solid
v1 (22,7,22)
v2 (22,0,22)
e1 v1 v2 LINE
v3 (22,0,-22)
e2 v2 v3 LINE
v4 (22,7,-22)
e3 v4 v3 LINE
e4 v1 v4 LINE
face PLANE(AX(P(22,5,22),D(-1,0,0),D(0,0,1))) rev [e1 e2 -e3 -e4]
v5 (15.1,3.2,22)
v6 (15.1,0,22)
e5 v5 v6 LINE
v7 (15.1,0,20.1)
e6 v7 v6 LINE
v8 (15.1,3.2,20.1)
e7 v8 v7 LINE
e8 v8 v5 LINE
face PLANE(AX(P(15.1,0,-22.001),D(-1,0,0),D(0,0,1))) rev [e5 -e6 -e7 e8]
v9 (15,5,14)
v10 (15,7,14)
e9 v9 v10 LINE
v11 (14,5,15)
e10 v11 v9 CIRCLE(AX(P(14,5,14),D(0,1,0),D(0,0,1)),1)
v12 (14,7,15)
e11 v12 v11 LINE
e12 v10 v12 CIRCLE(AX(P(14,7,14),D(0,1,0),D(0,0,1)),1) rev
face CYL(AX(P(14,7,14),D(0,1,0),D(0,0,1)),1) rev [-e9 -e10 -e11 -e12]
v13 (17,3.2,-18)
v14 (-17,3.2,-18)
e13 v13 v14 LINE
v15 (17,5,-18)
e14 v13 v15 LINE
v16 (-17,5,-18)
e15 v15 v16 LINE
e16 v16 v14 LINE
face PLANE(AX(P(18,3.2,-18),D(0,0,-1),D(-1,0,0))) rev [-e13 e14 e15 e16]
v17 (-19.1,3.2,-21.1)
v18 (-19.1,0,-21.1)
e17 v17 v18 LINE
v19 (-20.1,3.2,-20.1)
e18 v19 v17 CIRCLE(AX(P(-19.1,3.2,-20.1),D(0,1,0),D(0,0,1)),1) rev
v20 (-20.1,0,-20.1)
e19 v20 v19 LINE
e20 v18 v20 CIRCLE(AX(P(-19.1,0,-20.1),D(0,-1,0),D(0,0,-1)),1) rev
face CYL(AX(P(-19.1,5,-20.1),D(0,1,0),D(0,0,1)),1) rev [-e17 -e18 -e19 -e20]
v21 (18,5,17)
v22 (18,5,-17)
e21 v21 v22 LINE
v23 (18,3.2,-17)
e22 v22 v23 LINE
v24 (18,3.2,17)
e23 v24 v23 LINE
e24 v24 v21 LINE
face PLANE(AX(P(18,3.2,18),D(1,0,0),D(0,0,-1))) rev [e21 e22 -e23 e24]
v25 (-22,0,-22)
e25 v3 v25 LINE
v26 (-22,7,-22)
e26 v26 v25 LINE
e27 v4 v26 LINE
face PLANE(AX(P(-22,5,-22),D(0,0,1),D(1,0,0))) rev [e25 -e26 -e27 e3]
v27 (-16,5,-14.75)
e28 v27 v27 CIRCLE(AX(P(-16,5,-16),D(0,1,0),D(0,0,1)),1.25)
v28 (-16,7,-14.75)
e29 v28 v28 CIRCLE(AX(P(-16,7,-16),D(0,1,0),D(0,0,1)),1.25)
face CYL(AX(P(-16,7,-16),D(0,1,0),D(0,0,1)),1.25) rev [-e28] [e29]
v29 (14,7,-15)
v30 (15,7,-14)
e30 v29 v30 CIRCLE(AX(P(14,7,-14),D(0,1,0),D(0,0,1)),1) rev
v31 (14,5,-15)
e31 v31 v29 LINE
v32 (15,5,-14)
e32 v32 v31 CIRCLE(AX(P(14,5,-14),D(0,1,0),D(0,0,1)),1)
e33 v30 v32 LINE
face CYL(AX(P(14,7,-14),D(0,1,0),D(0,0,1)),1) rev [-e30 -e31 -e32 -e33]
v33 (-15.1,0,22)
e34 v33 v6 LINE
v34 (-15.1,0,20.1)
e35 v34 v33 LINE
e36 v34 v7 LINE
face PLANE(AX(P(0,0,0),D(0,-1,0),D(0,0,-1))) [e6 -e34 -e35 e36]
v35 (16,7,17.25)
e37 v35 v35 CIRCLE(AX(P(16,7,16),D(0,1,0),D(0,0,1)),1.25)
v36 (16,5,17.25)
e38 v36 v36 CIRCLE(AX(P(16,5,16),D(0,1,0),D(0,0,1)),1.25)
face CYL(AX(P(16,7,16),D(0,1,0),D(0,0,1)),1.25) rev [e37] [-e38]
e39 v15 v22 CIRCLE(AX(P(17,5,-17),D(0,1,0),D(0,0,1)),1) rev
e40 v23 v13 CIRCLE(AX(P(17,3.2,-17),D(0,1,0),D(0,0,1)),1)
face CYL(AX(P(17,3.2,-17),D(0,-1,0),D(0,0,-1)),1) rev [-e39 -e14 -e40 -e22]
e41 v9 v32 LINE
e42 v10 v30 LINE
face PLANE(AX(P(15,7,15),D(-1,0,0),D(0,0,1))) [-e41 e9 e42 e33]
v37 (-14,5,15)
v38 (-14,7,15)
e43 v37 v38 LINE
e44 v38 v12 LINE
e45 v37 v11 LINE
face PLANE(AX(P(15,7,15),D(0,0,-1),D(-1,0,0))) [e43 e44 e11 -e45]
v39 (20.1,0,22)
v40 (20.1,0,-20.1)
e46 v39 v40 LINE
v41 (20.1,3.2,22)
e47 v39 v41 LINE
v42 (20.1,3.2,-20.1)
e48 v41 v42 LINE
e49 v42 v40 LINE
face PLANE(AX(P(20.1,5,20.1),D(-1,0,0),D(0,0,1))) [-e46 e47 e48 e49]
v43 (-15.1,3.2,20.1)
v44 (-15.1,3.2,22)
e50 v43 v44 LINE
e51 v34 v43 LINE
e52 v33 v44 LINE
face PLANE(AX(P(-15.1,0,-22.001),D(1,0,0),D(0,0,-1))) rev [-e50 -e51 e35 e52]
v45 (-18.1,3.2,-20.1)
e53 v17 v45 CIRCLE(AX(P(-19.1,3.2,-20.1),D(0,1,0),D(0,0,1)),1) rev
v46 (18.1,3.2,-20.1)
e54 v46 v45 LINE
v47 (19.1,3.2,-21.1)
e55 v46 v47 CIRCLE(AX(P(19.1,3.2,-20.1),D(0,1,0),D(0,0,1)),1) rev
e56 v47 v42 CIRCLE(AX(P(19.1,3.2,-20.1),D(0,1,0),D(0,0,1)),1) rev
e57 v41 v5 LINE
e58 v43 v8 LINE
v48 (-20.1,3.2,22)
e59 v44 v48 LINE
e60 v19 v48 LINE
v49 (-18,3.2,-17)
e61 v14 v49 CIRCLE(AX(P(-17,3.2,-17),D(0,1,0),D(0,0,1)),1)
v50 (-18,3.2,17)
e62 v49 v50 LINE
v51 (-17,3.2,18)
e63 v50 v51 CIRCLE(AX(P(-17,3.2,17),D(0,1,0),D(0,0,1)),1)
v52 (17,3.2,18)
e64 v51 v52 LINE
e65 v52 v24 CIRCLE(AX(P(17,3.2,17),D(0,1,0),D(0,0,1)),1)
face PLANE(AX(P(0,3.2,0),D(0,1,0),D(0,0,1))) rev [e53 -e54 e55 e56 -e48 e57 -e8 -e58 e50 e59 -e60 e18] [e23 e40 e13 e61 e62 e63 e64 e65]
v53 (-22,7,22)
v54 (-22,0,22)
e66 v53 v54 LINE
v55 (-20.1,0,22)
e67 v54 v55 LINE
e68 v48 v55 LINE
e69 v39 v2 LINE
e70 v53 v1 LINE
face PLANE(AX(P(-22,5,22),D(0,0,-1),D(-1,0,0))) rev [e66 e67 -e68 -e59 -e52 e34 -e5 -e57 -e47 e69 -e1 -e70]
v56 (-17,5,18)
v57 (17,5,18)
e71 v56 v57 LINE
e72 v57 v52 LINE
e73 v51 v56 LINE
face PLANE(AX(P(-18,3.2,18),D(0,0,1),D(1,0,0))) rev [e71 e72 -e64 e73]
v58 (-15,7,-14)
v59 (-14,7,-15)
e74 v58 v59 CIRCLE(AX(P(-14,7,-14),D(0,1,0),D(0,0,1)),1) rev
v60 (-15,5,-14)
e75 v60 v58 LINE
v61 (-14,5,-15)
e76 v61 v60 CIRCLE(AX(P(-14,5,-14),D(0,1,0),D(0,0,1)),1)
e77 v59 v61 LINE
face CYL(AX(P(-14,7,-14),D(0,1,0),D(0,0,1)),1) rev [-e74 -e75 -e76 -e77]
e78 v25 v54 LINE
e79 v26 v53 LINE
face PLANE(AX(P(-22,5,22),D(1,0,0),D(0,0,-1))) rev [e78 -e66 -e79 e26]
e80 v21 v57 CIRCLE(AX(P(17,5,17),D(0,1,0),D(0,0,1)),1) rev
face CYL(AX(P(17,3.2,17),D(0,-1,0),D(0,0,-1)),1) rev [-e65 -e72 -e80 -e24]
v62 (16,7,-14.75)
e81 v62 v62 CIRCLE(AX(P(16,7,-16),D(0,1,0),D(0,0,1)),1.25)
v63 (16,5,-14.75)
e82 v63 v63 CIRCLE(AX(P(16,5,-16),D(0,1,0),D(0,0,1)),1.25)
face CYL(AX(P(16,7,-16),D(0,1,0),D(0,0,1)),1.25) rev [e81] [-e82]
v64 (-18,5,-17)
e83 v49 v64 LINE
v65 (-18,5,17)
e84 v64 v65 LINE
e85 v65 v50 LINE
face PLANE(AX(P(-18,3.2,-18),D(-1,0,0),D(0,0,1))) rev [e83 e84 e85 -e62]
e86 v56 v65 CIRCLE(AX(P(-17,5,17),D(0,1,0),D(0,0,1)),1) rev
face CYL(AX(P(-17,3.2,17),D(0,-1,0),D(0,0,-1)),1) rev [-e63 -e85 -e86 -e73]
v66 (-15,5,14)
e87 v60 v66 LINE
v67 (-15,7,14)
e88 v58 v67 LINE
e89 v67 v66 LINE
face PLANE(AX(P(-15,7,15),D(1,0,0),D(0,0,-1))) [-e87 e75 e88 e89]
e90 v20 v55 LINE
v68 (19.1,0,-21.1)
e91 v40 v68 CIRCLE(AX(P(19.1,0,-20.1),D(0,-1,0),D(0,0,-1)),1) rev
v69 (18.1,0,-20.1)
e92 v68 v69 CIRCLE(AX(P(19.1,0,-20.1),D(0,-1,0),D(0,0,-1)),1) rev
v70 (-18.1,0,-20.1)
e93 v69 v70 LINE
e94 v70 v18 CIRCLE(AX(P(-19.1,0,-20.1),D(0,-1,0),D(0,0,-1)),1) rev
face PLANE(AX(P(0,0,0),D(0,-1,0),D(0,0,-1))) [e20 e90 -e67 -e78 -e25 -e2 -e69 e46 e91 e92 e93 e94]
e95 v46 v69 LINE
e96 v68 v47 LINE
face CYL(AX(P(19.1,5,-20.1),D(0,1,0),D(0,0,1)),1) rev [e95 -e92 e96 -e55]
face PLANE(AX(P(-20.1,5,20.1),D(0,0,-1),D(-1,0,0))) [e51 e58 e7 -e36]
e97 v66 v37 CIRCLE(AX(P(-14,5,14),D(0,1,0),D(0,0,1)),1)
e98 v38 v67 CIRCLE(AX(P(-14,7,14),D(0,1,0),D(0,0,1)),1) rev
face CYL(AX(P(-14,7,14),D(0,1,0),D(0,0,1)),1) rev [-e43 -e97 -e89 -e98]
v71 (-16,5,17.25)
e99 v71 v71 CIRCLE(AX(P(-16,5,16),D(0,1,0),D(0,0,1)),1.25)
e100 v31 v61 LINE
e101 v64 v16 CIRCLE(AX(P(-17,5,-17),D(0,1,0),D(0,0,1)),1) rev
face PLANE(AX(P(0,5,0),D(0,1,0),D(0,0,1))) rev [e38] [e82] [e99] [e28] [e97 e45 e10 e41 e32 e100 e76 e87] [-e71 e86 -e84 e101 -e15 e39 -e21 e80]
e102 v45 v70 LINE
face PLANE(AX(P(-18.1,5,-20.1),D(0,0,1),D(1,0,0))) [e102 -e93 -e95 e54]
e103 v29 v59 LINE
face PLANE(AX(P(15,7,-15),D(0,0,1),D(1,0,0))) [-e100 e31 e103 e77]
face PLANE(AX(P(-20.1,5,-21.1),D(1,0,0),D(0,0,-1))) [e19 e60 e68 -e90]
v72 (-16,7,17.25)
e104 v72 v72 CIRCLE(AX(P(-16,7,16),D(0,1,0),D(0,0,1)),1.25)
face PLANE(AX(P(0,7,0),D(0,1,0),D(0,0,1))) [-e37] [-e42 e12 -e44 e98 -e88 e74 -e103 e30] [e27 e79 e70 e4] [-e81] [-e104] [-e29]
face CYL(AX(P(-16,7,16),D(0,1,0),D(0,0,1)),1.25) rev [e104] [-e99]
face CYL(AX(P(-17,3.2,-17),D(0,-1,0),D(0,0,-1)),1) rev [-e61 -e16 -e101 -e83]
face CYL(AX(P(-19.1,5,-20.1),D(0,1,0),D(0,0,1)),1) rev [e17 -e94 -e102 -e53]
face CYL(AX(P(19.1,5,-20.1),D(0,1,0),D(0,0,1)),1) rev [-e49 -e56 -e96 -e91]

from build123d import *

# Parameters (mm, degrees)
SKETCH1_W               = 44
SKETCH1_H               = 44
BOSS_EXTRUDE1_DEPTH     = 5
SKETCH2_W               = 36
SKETCH2_H               = 36
BOSS_EXTRUDE2_DEPTH     = 1.8
CUT_EXTRUDE1_REACH      = 51.447
SKETCH3_W               = 5
SKETCH3_H               = 3.2
SKETCH4_W               = 44
SKETCH4_H               = 44
SKETCH4_W_2             = 30
SKETCH4_H_2             = 30
BOSS_EXTRUDE3_DEPTH     = 2
FILLET1_R               = 1
TAP_DRILL_FOR_M3_TAP1_D = 2.5


with BuildPart() as part:
    # Sketch1 → Boss-Extrude1 (new body)
    with BuildSketch(Plane(origin=(0, 0, 0), x_dir=(1, 0, 0), z_dir=(0, 1, 0))):
        Rectangle(SKETCH1_W, SKETCH1_H)
        Polygon((20.1, -20.1), (20.1, 21.1), (18.1, 21.1), (18.1, 20.1), (-18.1, 20.1), (-18.1, 21.1), (-20.1, 21.1), (-20.1, -20.1), align=None, mode=Mode.SUBTRACT)
    extrude(amount=BOSS_EXTRUDE1_DEPTH)

    # Sketch2 → Boss-Extrude2 (add)
    with BuildSketch(Plane(origin=(0, 5, 0), x_dir=(1, 0, 0), z_dir=(0, 1, 0))):
        Polygon((-20.1, 21.1), (-20.1, -20.1), (20.1, -20.1), (20.1, 21.1), (18.1, 21.1), (18.1, 20.1), (-18.1, 20.1), (-18.1, 21.1), align=None)
        Rectangle(SKETCH2_W, SKETCH2_H, mode=Mode.SUBTRACT)
    extrude(amount=-BOSS_EXTRUDE2_DEPTH)

    # Sketch3 → Cut-Extrude1 (cut, up to next)
    with BuildSketch(Plane.XY.offset(22), mode=Mode.PRIVATE) as cut_extrude1_sk1:
        with Locations((-17.6, 1.6)):
            Rectangle(SKETCH3_W, SKETCH3_H)
    cut_extrude1_tool1 = extrude(cut_extrude1_sk1.sketch, amount=-CUT_EXTRUDE1_REACH, mode=Mode.PRIVATE) & part.part
    # Sketch3 → Cut-Extrude1 (cut, up to next)
    with BuildSketch(Plane.XY.offset(22), mode=Mode.PRIVATE) as cut_extrude1_sk2:
        with Locations((17.6, 1.6)):
            Rectangle(SKETCH3_W, SKETCH3_H)
    cut_extrude1_tool2 = extrude(cut_extrude1_sk2.sketch, amount=-CUT_EXTRUDE1_REACH, mode=Mode.PRIVATE) & part.part
    add(cut_extrude1_tool1.solids().sort_by_distance((-17.6, 1.6, 22))[0], mode=Mode.SUBTRACT)
    add(cut_extrude1_tool2.solids().sort_by_distance((17.6, 1.6, 22))[0], mode=Mode.SUBTRACT)

    # Sketch4 → Boss-Extrude3 (add)
    with BuildSketch(Plane(origin=(0, 5, 0), x_dir=(1, 0, 0), z_dir=(0, 1, 0))):
        Rectangle(SKETCH4_W, SKETCH4_H)
        Rectangle(SKETCH4_W_2, SKETCH4_H_2, mode=Mode.SUBTRACT)
    extrude(amount=BOSS_EXTRUDE3_DEPTH)

    # Fillet1
    fillet1_edges = [part.edges().sort_by_distance(p)[0] for p in [
        (-18, 4.1, 18),
        (18, 4.1, 18),
        (18, 4.1, -18),
        (-18, 4.1, -18),
        (-20.1, 1.6, -21.1),
        (-18.1, 1.6, -21.1),
        (18.1, 1.6, -21.1),
        (20.1, 1.6, -21.1),
        (-15, 6, -15),
        (-15, 6, 15),
        (15, 6, -15),
        (15, 6, 15),
    ]]
    fillet(fillet1_edges, radius=FILLET1_R - 0.0001)  # a hair under: the kernel refuses the full size

    # Tap Drill for M3 Tap1 (through all)
    with Locations(Plane(origin=(0, 7, 0), x_dir=(1, 0, 0), z_dir=(0, 1, 0))):
        with Locations((-16, 16), (16, 16), (16, -16), (-16, -16)):
            Hole(TAP_DRILL_FOR_M3_TAP1_D / 2)


solid = part.part
